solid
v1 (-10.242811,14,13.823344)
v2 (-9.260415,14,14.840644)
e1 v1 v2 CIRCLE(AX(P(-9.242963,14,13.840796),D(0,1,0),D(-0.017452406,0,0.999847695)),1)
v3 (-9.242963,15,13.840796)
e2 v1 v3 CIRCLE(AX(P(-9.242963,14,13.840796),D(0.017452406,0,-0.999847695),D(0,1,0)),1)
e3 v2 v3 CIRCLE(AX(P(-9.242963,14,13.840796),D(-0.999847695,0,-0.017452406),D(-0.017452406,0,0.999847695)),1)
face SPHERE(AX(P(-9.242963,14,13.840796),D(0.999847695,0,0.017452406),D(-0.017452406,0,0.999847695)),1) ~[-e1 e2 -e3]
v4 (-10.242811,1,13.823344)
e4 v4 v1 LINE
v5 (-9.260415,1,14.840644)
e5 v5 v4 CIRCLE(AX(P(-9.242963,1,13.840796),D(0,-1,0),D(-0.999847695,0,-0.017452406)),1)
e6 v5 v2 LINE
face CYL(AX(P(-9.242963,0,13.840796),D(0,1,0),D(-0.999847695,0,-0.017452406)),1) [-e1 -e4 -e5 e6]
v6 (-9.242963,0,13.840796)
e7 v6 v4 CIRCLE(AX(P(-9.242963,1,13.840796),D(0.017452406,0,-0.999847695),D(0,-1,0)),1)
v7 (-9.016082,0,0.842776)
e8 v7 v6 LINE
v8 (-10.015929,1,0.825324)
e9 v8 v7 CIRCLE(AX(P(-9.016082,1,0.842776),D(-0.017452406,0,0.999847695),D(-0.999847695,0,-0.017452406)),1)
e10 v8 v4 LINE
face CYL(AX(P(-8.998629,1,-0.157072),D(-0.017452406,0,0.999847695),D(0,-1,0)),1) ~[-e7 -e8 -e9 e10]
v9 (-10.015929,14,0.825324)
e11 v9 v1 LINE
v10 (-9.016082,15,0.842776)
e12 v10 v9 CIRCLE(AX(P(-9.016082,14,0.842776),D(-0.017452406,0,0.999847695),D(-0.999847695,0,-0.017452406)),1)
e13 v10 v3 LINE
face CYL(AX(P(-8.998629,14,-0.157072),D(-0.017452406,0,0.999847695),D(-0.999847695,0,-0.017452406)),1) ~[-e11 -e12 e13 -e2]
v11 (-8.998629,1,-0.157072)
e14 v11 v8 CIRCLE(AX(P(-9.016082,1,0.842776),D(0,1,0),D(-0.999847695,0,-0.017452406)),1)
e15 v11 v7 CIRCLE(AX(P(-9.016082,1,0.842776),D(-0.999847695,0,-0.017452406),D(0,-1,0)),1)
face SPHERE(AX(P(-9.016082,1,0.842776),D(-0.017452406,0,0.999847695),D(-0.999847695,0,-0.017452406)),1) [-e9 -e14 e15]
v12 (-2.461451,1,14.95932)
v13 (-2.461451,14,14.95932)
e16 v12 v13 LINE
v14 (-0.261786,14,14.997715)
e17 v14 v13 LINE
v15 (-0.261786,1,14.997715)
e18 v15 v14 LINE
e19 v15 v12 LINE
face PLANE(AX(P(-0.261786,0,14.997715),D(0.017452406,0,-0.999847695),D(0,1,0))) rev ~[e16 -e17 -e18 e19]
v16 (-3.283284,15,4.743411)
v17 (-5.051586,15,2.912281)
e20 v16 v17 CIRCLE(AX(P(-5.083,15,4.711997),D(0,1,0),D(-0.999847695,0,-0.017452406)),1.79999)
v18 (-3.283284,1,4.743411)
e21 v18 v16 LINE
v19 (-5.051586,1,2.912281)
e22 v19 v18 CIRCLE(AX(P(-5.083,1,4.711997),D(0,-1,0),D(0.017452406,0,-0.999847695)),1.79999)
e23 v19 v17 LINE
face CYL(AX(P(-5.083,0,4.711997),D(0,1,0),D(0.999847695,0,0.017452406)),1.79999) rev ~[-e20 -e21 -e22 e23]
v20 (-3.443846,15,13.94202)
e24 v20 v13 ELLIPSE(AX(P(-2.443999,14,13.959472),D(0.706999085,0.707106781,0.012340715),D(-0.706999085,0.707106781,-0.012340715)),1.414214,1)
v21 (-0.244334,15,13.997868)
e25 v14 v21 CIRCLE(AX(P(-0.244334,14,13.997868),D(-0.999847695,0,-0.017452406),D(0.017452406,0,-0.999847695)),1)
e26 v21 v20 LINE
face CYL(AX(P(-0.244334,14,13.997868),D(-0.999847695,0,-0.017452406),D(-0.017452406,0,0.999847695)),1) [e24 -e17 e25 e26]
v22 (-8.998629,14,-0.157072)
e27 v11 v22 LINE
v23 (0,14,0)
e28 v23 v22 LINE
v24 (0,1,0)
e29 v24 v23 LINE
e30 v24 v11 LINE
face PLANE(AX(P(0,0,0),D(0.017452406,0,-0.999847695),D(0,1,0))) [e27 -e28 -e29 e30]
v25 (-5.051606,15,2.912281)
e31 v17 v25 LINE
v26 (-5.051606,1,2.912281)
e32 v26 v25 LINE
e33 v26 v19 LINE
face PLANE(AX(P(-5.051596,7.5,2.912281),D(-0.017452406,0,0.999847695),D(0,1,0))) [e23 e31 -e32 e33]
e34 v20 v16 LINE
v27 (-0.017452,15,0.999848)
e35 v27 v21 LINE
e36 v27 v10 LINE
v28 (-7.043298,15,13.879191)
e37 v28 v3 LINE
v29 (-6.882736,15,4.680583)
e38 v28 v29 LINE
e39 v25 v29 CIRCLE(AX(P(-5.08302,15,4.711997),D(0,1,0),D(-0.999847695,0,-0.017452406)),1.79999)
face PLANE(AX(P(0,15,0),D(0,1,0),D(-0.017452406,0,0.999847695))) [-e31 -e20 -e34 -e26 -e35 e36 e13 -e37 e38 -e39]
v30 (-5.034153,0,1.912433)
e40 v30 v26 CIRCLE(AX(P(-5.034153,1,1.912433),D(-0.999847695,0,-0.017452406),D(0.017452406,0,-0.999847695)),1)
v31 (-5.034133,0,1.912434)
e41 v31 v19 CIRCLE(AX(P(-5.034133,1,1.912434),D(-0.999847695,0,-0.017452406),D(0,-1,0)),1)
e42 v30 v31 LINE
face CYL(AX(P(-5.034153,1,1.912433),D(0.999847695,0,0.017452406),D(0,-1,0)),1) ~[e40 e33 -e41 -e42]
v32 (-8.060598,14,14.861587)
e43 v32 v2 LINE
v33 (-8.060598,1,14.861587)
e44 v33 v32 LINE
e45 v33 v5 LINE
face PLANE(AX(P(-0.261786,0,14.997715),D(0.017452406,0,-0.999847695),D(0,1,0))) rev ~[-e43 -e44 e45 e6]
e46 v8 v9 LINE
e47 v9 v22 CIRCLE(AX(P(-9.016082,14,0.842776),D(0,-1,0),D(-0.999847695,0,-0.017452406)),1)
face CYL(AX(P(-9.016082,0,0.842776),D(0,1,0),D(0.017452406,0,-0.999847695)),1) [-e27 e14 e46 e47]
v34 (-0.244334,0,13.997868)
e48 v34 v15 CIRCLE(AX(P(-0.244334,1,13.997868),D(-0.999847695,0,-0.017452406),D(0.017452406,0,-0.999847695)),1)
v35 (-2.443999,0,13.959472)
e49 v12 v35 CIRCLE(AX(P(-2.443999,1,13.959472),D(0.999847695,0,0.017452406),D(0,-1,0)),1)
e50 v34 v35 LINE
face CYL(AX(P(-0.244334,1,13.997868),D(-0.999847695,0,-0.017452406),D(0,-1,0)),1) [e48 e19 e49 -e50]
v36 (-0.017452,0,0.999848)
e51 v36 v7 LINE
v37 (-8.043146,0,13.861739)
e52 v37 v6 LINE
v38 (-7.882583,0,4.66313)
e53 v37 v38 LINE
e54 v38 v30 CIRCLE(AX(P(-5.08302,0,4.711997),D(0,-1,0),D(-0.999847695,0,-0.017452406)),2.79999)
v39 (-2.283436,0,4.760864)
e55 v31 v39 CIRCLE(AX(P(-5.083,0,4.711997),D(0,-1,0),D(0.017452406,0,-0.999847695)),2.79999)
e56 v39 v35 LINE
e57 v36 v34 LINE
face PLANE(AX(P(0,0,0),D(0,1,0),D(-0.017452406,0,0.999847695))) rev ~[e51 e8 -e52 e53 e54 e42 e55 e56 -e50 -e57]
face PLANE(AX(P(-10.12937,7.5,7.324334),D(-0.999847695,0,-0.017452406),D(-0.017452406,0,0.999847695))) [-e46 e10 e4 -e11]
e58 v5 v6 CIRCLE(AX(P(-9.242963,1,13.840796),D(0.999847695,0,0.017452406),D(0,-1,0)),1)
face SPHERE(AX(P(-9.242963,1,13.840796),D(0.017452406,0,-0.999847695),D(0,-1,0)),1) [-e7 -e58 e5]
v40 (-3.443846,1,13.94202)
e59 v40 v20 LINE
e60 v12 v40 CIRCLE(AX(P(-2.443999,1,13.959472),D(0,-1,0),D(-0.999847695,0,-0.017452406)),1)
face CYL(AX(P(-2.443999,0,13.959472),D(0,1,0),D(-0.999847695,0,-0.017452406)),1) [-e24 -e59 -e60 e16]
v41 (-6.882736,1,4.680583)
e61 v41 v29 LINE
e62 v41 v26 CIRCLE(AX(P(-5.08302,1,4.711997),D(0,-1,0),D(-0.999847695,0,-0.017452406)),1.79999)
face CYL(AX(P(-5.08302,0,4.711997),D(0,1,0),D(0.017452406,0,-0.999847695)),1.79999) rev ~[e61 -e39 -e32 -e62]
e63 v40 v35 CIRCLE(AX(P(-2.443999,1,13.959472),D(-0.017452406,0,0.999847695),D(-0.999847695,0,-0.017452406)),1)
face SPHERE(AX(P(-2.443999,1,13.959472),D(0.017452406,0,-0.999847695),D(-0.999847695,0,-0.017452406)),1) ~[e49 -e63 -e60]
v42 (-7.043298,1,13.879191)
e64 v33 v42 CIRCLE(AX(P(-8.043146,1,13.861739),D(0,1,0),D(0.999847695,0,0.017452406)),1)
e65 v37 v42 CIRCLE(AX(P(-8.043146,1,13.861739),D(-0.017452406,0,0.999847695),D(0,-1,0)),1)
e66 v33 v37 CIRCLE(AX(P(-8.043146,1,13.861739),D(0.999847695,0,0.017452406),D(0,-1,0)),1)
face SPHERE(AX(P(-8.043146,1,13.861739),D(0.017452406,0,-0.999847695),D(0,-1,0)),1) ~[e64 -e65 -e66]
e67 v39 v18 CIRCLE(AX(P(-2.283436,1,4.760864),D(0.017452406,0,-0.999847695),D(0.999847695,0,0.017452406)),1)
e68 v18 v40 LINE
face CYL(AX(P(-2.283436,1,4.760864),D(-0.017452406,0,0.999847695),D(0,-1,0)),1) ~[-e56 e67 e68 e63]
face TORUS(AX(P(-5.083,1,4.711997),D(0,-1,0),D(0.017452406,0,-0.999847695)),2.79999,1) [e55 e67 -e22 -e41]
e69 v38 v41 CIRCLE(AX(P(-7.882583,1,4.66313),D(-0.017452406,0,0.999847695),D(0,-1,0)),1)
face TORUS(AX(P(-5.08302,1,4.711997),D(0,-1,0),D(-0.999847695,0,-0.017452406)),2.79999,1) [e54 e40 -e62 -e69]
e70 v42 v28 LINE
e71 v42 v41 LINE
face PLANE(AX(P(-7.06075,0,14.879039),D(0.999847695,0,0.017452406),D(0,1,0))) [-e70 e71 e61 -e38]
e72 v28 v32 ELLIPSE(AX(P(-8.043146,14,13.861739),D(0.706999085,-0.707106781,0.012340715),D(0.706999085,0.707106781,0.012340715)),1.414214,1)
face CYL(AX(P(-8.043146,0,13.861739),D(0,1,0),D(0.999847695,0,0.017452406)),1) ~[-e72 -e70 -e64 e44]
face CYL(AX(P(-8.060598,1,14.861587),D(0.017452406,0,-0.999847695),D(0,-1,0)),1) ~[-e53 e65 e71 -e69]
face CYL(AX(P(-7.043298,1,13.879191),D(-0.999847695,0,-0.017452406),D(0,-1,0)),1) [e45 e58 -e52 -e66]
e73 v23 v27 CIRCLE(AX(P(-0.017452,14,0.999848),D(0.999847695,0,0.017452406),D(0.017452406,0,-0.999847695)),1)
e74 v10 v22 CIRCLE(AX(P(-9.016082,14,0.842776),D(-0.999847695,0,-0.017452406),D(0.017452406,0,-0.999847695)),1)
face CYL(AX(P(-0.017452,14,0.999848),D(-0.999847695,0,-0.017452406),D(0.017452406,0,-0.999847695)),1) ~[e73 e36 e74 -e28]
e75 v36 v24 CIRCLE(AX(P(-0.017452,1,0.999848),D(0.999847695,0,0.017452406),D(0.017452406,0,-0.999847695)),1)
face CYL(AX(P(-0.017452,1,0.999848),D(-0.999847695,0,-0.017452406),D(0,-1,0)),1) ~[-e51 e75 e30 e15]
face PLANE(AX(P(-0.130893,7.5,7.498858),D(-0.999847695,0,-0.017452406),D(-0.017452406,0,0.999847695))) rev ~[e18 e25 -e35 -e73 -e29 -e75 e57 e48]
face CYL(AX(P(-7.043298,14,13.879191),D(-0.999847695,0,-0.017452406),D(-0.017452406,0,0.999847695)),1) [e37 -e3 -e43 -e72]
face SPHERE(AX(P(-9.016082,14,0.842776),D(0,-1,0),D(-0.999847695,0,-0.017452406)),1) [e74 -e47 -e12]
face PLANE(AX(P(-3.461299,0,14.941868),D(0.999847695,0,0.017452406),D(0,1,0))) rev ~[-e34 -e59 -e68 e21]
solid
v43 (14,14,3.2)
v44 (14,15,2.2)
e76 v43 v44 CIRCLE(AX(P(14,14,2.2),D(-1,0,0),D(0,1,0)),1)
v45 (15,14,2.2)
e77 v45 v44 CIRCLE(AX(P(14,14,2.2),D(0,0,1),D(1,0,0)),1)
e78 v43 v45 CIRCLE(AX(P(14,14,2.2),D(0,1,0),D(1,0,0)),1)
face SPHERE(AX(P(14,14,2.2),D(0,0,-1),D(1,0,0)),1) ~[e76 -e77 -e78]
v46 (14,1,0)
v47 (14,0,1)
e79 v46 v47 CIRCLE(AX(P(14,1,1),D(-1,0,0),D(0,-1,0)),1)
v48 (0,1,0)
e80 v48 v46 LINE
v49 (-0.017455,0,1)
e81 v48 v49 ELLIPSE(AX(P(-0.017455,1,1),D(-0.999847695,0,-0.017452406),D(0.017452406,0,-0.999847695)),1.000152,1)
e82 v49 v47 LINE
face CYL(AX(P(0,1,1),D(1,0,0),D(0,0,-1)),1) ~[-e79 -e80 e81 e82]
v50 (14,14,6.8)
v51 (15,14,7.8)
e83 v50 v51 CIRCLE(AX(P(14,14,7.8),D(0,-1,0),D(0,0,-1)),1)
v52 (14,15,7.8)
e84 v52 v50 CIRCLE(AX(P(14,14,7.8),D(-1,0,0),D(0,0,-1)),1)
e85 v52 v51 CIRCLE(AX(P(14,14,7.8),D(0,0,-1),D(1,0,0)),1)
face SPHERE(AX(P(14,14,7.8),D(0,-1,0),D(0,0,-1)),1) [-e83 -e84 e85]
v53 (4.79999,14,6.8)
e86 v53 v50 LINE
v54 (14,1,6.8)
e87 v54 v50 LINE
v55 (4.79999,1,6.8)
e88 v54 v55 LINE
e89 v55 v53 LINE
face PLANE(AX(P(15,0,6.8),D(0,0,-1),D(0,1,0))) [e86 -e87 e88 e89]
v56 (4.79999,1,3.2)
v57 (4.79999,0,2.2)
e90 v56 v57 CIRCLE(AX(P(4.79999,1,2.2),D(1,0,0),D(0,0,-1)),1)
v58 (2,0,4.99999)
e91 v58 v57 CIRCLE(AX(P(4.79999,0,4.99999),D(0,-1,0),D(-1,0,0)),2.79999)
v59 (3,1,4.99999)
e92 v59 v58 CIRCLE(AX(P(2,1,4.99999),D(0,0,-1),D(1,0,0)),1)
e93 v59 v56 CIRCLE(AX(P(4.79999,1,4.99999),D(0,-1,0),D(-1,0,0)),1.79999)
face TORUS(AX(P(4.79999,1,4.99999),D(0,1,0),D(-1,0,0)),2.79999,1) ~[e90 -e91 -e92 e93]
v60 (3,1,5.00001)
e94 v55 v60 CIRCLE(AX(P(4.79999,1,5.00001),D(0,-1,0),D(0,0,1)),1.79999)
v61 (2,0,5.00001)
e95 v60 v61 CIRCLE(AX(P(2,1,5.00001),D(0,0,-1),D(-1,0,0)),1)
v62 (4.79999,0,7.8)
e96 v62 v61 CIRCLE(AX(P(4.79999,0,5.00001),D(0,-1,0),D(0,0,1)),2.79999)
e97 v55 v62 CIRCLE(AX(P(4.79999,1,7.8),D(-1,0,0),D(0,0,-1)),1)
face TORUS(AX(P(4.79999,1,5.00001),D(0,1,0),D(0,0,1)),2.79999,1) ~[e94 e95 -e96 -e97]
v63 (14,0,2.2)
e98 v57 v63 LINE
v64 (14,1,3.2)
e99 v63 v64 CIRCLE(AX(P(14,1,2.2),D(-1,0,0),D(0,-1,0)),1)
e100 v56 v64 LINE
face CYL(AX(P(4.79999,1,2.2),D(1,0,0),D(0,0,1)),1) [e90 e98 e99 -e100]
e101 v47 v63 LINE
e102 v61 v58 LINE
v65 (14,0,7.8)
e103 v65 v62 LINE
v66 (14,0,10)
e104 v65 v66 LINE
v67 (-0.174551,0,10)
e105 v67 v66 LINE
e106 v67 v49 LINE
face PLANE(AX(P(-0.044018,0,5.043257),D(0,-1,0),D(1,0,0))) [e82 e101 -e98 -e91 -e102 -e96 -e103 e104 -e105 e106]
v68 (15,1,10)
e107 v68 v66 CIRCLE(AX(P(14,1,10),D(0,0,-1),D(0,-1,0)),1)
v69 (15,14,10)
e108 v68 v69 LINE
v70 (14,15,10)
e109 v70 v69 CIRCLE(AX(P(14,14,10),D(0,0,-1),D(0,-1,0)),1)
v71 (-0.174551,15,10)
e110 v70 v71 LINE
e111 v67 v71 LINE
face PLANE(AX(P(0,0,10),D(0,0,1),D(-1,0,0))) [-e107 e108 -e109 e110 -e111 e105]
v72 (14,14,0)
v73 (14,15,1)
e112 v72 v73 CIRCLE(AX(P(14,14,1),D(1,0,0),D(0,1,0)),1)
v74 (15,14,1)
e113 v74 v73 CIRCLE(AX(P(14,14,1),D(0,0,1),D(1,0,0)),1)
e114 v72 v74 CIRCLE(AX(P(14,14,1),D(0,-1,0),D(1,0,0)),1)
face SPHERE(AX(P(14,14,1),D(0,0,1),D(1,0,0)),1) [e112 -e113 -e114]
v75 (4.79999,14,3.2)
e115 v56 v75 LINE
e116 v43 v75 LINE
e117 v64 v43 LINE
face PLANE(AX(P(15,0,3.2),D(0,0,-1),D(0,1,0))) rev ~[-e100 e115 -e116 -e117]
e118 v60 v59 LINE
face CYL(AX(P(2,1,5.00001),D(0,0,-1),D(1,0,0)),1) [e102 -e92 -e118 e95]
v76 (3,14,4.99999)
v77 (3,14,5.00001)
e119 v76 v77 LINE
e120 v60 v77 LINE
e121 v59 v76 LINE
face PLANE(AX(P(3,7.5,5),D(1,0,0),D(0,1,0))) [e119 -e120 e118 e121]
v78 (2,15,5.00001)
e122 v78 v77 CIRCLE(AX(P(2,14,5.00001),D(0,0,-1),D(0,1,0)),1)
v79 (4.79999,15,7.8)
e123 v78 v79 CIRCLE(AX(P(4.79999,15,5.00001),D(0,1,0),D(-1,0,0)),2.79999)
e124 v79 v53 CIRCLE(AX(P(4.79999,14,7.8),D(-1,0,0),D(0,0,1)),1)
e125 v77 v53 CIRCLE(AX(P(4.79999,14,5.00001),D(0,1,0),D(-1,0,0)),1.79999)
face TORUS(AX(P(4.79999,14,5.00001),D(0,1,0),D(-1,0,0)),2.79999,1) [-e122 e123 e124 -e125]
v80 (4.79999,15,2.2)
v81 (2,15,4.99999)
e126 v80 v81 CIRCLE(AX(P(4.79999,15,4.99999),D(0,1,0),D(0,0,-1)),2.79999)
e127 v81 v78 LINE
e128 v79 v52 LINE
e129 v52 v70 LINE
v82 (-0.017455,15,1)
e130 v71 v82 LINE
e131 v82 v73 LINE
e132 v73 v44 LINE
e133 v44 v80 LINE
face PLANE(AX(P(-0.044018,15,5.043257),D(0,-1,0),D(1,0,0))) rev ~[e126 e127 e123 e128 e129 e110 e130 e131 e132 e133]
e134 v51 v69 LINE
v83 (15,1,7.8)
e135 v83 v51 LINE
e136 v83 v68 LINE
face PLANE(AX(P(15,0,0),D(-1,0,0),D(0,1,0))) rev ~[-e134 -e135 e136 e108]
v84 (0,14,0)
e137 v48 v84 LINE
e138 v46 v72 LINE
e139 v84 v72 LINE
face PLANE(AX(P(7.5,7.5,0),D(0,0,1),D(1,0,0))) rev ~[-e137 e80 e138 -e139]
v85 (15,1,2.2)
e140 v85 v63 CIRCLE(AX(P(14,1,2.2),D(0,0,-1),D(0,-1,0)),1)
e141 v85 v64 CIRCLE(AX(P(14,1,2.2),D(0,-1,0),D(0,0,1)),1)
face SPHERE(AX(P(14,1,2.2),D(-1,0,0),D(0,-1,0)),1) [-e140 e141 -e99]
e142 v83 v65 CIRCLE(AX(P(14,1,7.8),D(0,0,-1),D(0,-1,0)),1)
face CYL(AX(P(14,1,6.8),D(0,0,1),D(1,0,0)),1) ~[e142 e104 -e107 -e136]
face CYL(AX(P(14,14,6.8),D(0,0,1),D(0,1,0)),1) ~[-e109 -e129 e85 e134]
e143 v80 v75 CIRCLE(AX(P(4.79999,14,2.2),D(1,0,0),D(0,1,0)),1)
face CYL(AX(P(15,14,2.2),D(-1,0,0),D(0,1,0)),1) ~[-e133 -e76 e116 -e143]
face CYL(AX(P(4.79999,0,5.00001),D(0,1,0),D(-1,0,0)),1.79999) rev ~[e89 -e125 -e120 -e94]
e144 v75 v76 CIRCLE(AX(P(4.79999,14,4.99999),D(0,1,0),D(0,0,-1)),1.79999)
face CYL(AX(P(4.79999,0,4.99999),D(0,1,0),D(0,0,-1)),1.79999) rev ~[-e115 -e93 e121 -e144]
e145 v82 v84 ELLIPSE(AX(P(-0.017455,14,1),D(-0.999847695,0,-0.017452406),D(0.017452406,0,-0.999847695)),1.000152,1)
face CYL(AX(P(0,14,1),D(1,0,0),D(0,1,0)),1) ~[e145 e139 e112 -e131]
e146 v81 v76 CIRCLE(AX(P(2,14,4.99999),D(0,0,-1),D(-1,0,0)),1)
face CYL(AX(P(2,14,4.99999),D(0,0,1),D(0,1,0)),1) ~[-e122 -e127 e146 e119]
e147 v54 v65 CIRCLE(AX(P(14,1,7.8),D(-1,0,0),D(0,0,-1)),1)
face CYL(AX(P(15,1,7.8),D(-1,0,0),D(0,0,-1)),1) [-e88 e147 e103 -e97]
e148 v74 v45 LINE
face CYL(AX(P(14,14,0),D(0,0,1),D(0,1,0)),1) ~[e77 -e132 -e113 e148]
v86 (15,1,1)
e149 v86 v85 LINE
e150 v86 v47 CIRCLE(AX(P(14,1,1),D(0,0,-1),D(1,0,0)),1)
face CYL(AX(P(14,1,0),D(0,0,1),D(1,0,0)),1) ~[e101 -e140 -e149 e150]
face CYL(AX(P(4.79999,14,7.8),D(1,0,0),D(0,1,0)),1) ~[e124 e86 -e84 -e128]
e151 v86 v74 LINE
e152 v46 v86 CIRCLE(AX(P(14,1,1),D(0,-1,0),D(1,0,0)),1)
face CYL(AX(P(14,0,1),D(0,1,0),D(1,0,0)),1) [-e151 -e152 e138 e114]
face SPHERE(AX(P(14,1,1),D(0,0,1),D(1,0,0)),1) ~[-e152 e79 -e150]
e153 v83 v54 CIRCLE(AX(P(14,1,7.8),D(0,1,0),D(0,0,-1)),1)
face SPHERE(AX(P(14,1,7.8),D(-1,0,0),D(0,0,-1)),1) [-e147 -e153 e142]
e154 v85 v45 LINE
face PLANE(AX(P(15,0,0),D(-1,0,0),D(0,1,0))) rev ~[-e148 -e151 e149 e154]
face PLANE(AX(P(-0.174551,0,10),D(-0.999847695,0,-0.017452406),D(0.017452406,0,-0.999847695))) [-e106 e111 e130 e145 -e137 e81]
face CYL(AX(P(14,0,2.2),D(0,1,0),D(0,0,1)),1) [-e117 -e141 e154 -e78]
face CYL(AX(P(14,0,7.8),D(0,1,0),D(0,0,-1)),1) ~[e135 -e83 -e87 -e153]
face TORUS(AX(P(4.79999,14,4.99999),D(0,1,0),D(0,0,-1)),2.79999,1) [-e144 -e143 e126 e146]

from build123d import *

# Parameters (mm, degrees)
F0_W     = 15
F0_H     = 15
F1_DEPTH = 10
F2_W     = 15
F2_H     = 3.6
F3_DEPTH = 12
F4_R     = 1.79999
F5_COUNT = 2
F5_ANGLE = 91
F7_DEPTH = 15
F8_R     = 1
F8_2_R   = 1


# Not quite as in the source:
# - a fillet or chamfer is up to 0.001 mm smaller than in the source, because OpenCascade refuses the exact size


with BuildPart() as f1:
    # F0 (on Top) → F1 (new body)
    with BuildSketch(Plane.XY):
        with Locations((7.5, 7.5)):
            Rectangle(F0_W, F0_H)
    extrude(amount=F1_DEPTH)

    # F2 (on face) → F3 (cut)
    with BuildSketch(Plane.YZ.offset(15)):
        with Locations((7.5, 5)):
            Rectangle(F2_W, F2_H)
    extrude(amount=-F3_DEPTH, mode=Mode.SUBTRACT)

    # F4 (radius 1.8 in the source; OpenCascade refuses exactly that, so slightly less here)
    f4_edges = [f1.edges().sort_by_distance(p)[0] for p in [
        (3, 7.5, 3.2),
        (3, 7.5, 6.8),
    ]]
    fillet(f4_edges, radius=F4_R)


with BuildPart() as f5_1:
    # F5: instance of F1
    add(f1.part.rotate(Axis((0, 7.5, 0), (0, -1, 0)), 1 * F5_ANGLE / (F5_COUNT - 1)))

    # F8#2
    f8_2_edges = [f5_1.edges().sort_by_distance(p)[0] for p in [
        (-10.12937, 0, 7.324334),
        (-6.971743, 0, 9.779811),
        (-8.660507, 0, 14.851115),
        (-7.06075, 7.5, 14.879039),
        (-8.660507, 15, 14.851115),
        (-10.260263, 7.5, 14.823191),
        (-9.998477, 7.5, -0.174524),
        (-10.12937, 15, 7.324334),
        (-3.461299, 7.5, 14.941868),
        (-4.999238, 0, -0.087262),
        (-4.999238, 15, -0.087262),
        (-1.861542, 0, 14.969792),
        (-1.861542, 15, 14.969792),
        (-6.333398, 0, 3.417192),
        (-5.051596, 0, 2.912281),
        (-3.788195, 0, 3.461619),
        (-3.372291, 0, 9.842639),
    ]]
    fillet(f8_2_edges, radius=F8_2_R)


with BuildPart() as f1_1:
    add(f1.part)

    # F6 (on face) → F7 (join, through all)
    with BuildSketch(Plane.XZ):
        Polygon((0, 0), (0, 10), (-0.1745506493, 10), align=None)
    extrude(amount=-F7_DEPTH)

    # F8
    f8_edges = [f1_1.edges().sort_by_distance(p)[0] for p in [
        (9.899995, 0, 6.8),
        (15, 7.5, 6.8),
        (15, 15, 1.6),
        (15, 0, 1.6),
        (15, 7.5, 3.2),
        (9.899995, 15, 3.2),
        (15, 7.5, 0),
        (7.5, 0, 0),
        (7.5, 15, 0),
        (15, 0, 8.4),
        (15, 15, 8.4),
        (9.899995, 15, 6.8),
        (3.527205, 15, 3.727205),
        (3, 15, 5),
        (3.527205, 15, 6.272795),
        (3.527205, 0, 6.272795),
        (9.899995, 0, 3.2),
        (3, 0, 5),
        (3.527205, 0, 3.727205),
    ]]
    fillet(f8_edges, radius=F8_R)


solid = Compound([f5_1.part, f1_1.part])
